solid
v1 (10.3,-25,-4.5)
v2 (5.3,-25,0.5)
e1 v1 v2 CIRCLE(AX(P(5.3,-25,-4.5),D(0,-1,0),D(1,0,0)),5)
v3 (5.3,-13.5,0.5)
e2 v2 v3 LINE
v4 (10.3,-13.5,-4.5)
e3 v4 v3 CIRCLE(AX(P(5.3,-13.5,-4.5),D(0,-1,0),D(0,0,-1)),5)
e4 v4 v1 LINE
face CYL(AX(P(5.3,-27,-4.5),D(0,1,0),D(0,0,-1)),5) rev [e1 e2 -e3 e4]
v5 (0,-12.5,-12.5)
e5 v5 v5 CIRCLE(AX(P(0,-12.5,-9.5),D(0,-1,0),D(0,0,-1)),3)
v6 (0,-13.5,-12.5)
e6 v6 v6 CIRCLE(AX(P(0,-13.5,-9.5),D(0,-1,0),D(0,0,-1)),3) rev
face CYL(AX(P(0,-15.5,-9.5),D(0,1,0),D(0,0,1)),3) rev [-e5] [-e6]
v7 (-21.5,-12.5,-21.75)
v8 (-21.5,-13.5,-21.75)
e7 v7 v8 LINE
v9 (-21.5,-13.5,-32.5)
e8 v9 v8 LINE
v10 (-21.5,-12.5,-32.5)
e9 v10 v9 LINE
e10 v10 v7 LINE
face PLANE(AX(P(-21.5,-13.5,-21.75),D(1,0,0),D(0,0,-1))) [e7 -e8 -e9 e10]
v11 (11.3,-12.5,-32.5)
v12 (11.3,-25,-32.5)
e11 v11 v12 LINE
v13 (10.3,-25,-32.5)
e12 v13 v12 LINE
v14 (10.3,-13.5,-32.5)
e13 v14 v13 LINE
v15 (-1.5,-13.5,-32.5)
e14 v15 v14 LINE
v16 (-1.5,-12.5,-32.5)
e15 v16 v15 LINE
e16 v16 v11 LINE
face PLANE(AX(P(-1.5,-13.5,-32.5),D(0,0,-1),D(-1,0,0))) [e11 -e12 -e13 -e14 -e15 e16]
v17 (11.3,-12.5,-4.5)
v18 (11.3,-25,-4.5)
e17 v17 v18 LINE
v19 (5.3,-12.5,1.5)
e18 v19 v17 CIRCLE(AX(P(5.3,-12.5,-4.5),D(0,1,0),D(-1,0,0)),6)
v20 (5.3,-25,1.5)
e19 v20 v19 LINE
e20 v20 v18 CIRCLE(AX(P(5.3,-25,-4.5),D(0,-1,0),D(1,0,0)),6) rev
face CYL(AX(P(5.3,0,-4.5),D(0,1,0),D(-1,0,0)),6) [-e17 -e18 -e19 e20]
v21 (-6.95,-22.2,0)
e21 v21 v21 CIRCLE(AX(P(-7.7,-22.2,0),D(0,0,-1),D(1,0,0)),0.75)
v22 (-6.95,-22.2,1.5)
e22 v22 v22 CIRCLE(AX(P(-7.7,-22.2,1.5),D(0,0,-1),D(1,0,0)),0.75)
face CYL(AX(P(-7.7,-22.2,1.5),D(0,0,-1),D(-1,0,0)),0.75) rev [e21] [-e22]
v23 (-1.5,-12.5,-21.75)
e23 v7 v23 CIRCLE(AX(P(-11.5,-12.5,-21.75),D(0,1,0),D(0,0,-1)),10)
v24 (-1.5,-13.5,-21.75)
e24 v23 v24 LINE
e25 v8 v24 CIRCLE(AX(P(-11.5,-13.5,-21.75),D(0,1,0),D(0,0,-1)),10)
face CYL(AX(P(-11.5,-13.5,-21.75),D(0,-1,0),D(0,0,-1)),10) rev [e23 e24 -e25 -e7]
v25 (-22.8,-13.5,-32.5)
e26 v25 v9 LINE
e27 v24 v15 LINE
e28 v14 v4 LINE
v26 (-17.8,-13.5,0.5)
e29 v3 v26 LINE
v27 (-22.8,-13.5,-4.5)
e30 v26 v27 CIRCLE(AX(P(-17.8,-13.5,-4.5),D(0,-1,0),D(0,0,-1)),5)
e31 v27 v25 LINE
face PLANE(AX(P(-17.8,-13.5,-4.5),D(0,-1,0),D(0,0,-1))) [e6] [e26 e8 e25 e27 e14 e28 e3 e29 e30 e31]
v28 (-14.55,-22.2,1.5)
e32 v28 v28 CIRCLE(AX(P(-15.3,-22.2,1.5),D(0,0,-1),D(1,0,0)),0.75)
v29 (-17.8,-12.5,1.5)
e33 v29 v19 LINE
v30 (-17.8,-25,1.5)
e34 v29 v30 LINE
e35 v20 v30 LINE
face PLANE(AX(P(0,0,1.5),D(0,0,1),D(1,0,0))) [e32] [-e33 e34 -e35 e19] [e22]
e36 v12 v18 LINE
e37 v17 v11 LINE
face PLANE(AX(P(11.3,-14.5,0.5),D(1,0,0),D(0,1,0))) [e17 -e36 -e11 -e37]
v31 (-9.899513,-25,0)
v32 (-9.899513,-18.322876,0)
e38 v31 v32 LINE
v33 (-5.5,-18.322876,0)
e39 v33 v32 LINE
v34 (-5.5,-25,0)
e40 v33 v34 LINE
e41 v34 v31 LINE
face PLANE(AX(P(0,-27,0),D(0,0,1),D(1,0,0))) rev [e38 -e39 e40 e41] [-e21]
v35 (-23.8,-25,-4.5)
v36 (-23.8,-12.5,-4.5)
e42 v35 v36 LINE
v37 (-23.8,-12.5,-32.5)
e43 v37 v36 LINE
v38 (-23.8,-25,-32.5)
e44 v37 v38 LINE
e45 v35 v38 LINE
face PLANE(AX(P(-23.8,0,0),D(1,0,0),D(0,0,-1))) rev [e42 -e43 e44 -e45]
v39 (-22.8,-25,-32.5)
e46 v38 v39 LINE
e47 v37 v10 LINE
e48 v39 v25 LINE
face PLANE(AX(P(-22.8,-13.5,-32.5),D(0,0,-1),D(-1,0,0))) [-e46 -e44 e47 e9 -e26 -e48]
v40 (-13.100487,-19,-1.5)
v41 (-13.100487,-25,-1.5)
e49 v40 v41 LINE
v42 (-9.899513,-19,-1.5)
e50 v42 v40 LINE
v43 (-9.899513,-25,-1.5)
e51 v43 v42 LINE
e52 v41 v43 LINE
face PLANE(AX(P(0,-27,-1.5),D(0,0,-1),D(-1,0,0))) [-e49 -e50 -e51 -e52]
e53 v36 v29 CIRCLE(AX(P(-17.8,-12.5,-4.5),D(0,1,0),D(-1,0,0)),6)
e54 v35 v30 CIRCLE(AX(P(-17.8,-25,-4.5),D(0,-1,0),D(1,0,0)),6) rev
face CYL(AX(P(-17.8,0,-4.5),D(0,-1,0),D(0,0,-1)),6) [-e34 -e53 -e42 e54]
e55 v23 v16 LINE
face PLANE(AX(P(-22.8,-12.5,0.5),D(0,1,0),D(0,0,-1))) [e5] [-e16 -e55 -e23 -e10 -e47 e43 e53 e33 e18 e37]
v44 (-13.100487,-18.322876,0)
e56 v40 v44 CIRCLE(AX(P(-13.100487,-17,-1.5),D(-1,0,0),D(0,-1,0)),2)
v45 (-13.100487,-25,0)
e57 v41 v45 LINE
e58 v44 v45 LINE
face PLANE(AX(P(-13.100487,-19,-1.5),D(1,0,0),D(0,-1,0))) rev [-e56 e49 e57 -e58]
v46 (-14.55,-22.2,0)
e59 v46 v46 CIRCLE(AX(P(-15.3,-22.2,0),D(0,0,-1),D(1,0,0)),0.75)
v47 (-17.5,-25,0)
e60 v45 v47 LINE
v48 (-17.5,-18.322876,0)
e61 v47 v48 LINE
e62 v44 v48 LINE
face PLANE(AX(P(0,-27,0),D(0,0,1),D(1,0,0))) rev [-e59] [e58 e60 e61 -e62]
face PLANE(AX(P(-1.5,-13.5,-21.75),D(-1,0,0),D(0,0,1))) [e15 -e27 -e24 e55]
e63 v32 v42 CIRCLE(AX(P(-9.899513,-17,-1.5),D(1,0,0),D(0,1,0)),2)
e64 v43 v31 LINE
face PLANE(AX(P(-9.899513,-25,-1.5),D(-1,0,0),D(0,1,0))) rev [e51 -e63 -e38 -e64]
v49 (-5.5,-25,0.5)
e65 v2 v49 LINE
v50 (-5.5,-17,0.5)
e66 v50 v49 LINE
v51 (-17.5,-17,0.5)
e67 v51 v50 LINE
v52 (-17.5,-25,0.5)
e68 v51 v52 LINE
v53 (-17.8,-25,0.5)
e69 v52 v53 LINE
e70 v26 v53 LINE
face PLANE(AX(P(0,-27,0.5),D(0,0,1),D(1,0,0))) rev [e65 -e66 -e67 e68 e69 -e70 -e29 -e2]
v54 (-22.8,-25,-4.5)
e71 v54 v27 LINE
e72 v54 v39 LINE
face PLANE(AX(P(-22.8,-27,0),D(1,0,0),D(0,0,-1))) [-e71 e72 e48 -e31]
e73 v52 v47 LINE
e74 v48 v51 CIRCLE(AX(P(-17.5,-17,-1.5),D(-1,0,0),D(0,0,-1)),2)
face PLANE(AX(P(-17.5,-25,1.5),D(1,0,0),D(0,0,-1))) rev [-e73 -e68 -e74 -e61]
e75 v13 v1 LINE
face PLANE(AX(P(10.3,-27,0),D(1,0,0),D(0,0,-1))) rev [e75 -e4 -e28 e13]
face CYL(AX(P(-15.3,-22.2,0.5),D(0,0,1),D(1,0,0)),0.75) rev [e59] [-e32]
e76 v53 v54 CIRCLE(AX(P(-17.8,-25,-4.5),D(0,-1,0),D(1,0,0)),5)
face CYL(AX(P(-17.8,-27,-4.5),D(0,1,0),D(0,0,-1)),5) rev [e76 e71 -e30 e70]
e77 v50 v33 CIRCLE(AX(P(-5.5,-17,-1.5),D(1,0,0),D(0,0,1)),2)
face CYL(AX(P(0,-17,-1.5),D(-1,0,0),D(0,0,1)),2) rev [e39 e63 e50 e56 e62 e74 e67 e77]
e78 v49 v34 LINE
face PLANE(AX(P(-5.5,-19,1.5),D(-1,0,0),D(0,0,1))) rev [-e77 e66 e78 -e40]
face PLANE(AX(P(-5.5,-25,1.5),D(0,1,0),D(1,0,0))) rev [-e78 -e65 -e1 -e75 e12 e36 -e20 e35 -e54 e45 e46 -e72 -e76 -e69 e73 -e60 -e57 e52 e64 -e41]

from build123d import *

# Parameters (mm, degrees)
SKETCH1_W             = 4.399513203
SKETCH1_H             = 6
SKETCH1_R             = 0.75
BOSS_EXTRUDE1_DEPTH   = 1.5
BOSS_EXTRUDE1_2_DEPTH = 1.5
BOSS_EXTRUDE2_START   = -1
SKETCH2_W             = 34.1
SKETCH2_H             = 12.5
SKETCH2_R             = 0.75
BOSS_EXTRUDE2_DEPTH   = 1
BOSS_EXTRUDE3_DEPTH   = 1
SKETCH5_W             = 34
SKETCH5_H             = 12.5
BOSS_EXTRUDE4_DEPTH   = 1
SKETCH6_W             = 34
SKETCH6_H             = 12.5
BOSS_EXTRUDE5_DEPTH   = 1
SKETCH7_W             = 3.200973594
SKETCH7_H             = 6
BOSS_EXTRUDE6_DEPTH   = 2
FILLET1_R             = 2
FILLET2_R             = 5
FILLET3_R             = 6
FILLET4_R             = 5
FILLET5_R             = 6
SKETCH8_R             = 3
CUT_EXTRUDE1_DEPTH    = 2
FILLET1_OF_MIRROR1_R  = 2
FILLET2_OF_MIRROR1_R  = 5
FILLET3_OF_MIRROR1_R  = 6
FILLET4_OF_MIRROR1_R  = 5
FILLET5_OF_MIRROR1_R  = 6
CUT_EXTRUDE2_START    = -10.5
CUT_EXTRUDE2_DEPTH    = 10.5
CUT_EXTRUDE4_START    = -1
CUT_EXTRUDE4_DEPTH    = 1


with BuildPart() as part:
    # Sketch1 → Boss-Extrude1 (new body)
    with BuildSketch(Plane.XY):
        with Locations((-7.699756602, -5)):
            Rectangle(SKETCH1_W, SKETCH1_H)
        with Locations((-7.7, -4.8)):
            Circle(SKETCH1_R, mode=Mode.SUBTRACT)
    boss_extrude1 = extrude(amount=BOSS_EXTRUDE1_DEPTH)



with BuildPart() as body_2:
    # Sketch1 → Boss-Extrude1 2 (new body)
    with BuildSketch(Plane.XY):
        with Locations((-15.300243399, -5)):
            Rectangle(SKETCH1_W, SKETCH1_H)
        with Locations((-15.3, -4.8)):
            Circle(SKETCH1_R, mode=Mode.SUBTRACT)
    boss_extrude1_2 = extrude(amount=BOSS_EXTRUDE1_2_DEPTH)


with BuildPart() as part_1:
    add(part.part)

    add(body_2.part)  # Boss-Extrude2 merges body 2
    # Sketch2 → Boss-Extrude2 (add)
    with BuildSketch(Plane.XY.offset(1.5).offset(BOSS_EXTRUDE2_START)):
        with Locations((-5.75, -8.25)):
            Rectangle(SKETCH2_W, SKETCH2_H)
        with Locations((-7.7, -4.8)):
            Circle(SKETCH2_R, mode=Mode.SUBTRACT)
        with Locations((-15.3, -4.8)):
            Circle(SKETCH2_R, mode=Mode.SUBTRACT)
    boss_extrude2 = extrude(amount=BOSS_EXTRUDE2_DEPTH)

    # Sketch4 → Boss-Extrude3 (add)
    with BuildSketch(Plane.XZ.offset(14.5)):
        with BuildLine():
            Line((-22.8, 0.5), (-22.8, -32.5))
            Line((-22.8, -32.5), (-21.5, -32.5))
            Line((-21.5, -32.5), (-21.5, -21.75))
            ThreePointArc((-21.5, -21.75), (-11.5, -11.75), (-1.5, -21.75))
            Line((-1.5, -21.75), (-1.5, -32.5))
            Line((-1.5, -32.5), (11.3, -32.5))
            Line((11.3, -32.5), (11.3, 0.5))
            Line((11.3, 0.5), (-22.8, 0.5))
        make_face()
    boss_extrude3 = extrude(amount=-BOSS_EXTRUDE3_DEPTH)

    # Sketch5 → Boss-Extrude4 (add)
    with BuildSketch(Plane.ZY.offset(22.8)):
        with Locations((-15.5, -8.25)):
            Rectangle(SKETCH5_W, SKETCH5_H)
    boss_extrude4 = extrude(amount=BOSS_EXTRUDE4_DEPTH)

    # Sketch6 → Boss-Extrude5 (add)
    with BuildSketch(Plane(origin=(11.3, 0, 0), x_dir=(0, 0, -1), z_dir=(1, 0, 0))):
        with Locations((15.5, -8.25)):
            Rectangle(SKETCH6_W, SKETCH6_H)
    boss_extrude5 = extrude(amount=-BOSS_EXTRUDE5_DEPTH)

    # Sketch7 → Boss-Extrude6 (add)
    with BuildSketch(Plane(origin=(0, 0, 0.5), x_dir=(-1, 0, 0), z_dir=(0, 0, -1))):
        with Locations((11.5, -5)):
            Rectangle(SKETCH7_W, SKETCH7_H)
    boss_extrude6 = extrude(amount=BOSS_EXTRUDE6_DEPTH)

    # Fillet1
    # the kernel refuses this fillet: 2 mm, written as the material it adds along each edge
    with BuildSketch(Plane(origin=(-17.5, -8, 0.5), x_dir=(0, 0, -1), z_dir=(1, 0, 0))) as fillet1_piece_1_section:
        with BuildLine():
            CenterArc((FILLET1_R, -FILLET1_R), FILLET1_R, 90, 90)
            Line((0, -FILLET1_R), (0, 0))
            Line((0, 0), (FILLET1_R, 0))
        make_face()
    fillet1_piece_1 = extrude(amount=12, mode=Mode.PRIVATE)
    fillet1_piece_1 = split(fillet1_piece_1, bisect_by=Plane(origin=(-15.300243398, -8.620266002, 0), z_dir=(0, 0, 1)), keep=Keep.TOP, mode=Mode.PRIVATE)
    fillet1_piece_1 = split(fillet1_piece_1, bisect_by=Plane(origin=(-13.100486797, -8.620266002, 0.317331321), z_dir=(-1, 0, 0)), keep=Keep.TOP, mode=Mode.PRIVATE)
    add(fillet1_piece_1)
    with BuildSketch(Plane(origin=(-17.5, -8, 0.5), x_dir=(0, 0, -1), z_dir=(1, 0, 0))) as fillet1_piece_2_section:
        with BuildLine():
            CenterArc((FILLET1_R, -FILLET1_R), FILLET1_R, 90, 90)
            Line((0, -FILLET1_R), (0, 0))
            Line((0, 0), (FILLET1_R, 0))
        make_face()
    fillet1_piece_2 = extrude(amount=12, mode=Mode.PRIVATE)
    fillet1_piece_2 = split(fillet1_piece_2, bisect_by=Plane(origin=(-9.899513203, -8.160707913, -0.423889575), z_dir=(-1, 0, 0)), keep=Keep.TOP, mode=Mode.PRIVATE)
    fillet1_piece_2 = split(fillet1_piece_2, bisect_by=Plane(origin=(-11.5, -8.160707913, 0), z_dir=(0, 0, -1)), keep=Keep.TOP, mode=Mode.PRIVATE)
    fillet1_piece_2 = split(fillet1_piece_2, bisect_by=Plane(origin=(-13.100486797, -8.160707913, -0.423889575), z_dir=(1, 0, 0)), keep=Keep.TOP, mode=Mode.PRIVATE)
    add(fillet1_piece_2)
    with BuildSketch(Plane(origin=(-17.5, -8, 0.5), x_dir=(0, 0, -1), z_dir=(1, 0, 0))) as fillet1_piece_3_section:
        with BuildLine():
            CenterArc((FILLET1_R, -FILLET1_R), FILLET1_R, 90, 90)
            Line((0, -FILLET1_R), (0, 0))
            Line((0, 0), (FILLET1_R, 0))
        make_face()
    fillet1_piece_3 = extrude(amount=12, mode=Mode.PRIVATE)
    fillet1_piece_3 = split(fillet1_piece_3, bisect_by=Plane(origin=(-9.899513203, -8.620266002, 0.317331321), z_dir=(-1, 0, 0)), keep=Keep.TOP, mode=Mode.PRIVATE)
    fillet1_piece_3 = split(fillet1_piece_3, bisect_by=Plane(origin=(-11.5, -8.620266002, 0), z_dir=(0, 0, 1)), keep=Keep.TOP, mode=Mode.PRIVATE)
    fillet1_piece_3 = split(fillet1_piece_3, bisect_by=Plane(origin=(-13.100486797, -8.620266002, 0.317331321), z_dir=(1, 0, 0)), keep=Keep.TOP, mode=Mode.PRIVATE)
    add(fillet1_piece_3)
    with BuildSketch(Plane(origin=(-17.5, -8, 0.5), x_dir=(0, 0, -1), z_dir=(1, 0, 0))) as fillet1_piece_4_section:
        with BuildLine():
            CenterArc((FILLET1_R, -FILLET1_R), FILLET1_R, 90, 90)
            Line((0, -FILLET1_R), (0, 0))
            Line((0, 0), (FILLET1_R, 0))
        make_face()
    fillet1_piece_4 = extrude(amount=12, mode=Mode.PRIVATE)
    fillet1_piece_4 = split(fillet1_piece_4, bisect_by=Plane(origin=(-9.899513203, -8.620266002, 0.317331321), z_dir=(1, 0, 0)), keep=Keep.TOP, mode=Mode.PRIVATE)
    fillet1_piece_4 = split(fillet1_piece_4, bisect_by=Plane(origin=(-7.699756602, -8.620266002, 0), z_dir=(0, 0, 1)), keep=Keep.TOP, mode=Mode.PRIVATE)
    add(fillet1_piece_4)

    # Fillet2
    fillet2_edges = [part_1.edges().sort_by_distance(p)[0] for p in [
        (-22.8, -7.75, 0.5),
    ]]
    fillet(fillet2_edges, radius=FILLET2_R)

    # Fillet3
    fillet3_edges = [part_1.edges().sort_by_distance(p)[0] for p in [
        (-23.8, -8.25, 1.5),
    ]]
    fillet(fillet3_edges, radius=FILLET3_R)

    # Fillet4
    fillet4_edges = [part_1.edges().sort_by_distance(p)[0] for p in [
        (10.3, -7.75, 0.5),
    ]]
    fillet(fillet4_edges, radius=FILLET4_R)

    # Fillet5
    fillet5_edges = [part_1.edges().sort_by_distance(p)[0] for p in [
        (11.3, -8.25, 1.5),
    ]]
    fillet(fillet5_edges, radius=FILLET5_R)

    # Sketch8 → Cut-Extrude1 (cut)
    with BuildSketch(Plane(origin=(0, -13.5, 0), x_dir=(1, 0, 0), z_dir=(0, 1, 0))):
        with Locations(Location((0, 9.5, 0), (0, 0, 270))):
            Circle(SKETCH8_R)
    cut_extrude1 = extrude(amount=-CUT_EXTRUDE1_DEPTH, mode=Mode.SUBTRACT)

    # Mirror1: Boss-Extrude1, Boss-Extrude1 2, Boss-Extrude2, Boss-Extrude3, Boss-Extrude4, Boss-Extrude5, Boss-Extrude6, Cut-Extrude1 across plane
    add(boss_extrude1.mirror(Plane(origin=(-11.5, -13.5, -21.75), x_dir=(0, 0, 1), z_dir=(0, -1, 0))))
    add(boss_extrude1_2.mirror(Plane(origin=(-11.5, -13.5, -21.75), x_dir=(0, 0, 1), z_dir=(0, -1, 0))))
    add(boss_extrude2.mirror(Plane(origin=(-11.5, -13.5, -21.75), x_dir=(0, 0, 1), z_dir=(0, -1, 0))))
    add(boss_extrude3.mirror(Plane(origin=(-11.5, -13.5, -21.75), x_dir=(0, 0, 1), z_dir=(0, -1, 0))))
    add(boss_extrude4.mirror(Plane(origin=(-11.5, -13.5, -21.75), x_dir=(0, 0, 1), z_dir=(0, -1, 0))))
    add(boss_extrude5.mirror(Plane(origin=(-11.5, -13.5, -21.75), x_dir=(0, 0, 1), z_dir=(0, -1, 0))))
    add(boss_extrude6.mirror(Plane(origin=(-11.5, -13.5, -21.75), x_dir=(0, 0, 1), z_dir=(0, -1, 0))))
    add(cut_extrude1.mirror(Plane(origin=(-11.5, -13.5, -21.75), x_dir=(0, 0, 1), z_dir=(0, -1, 0))), mode=Mode.SUBTRACT)

    # Fillet1 of Mirror1
    # the kernel refuses this fillet: 2 mm, written as the material it adds along each edge
    with BuildSketch(Plane(origin=(-5.5, -19, 0.5), x_dir=(0, 1, 0), z_dir=(-1, 0, 0))) as fillet1_of_mirror1_piece_1_section:
        with BuildLine():
            CenterArc((FILLET1_OF_MIRROR1_R, FILLET1_OF_MIRROR1_R), FILLET1_OF_MIRROR1_R, 180, 90)
            Line((0, FILLET1_OF_MIRROR1_R), (0, 0))
            Line((0, 0), (FILLET1_OF_MIRROR1_R, 0))
        make_face()
    fillet1_of_mirror1_piece_1 = extrude(amount=12, mode=Mode.PRIVATE)
    fillet1_of_mirror1_piece_1 = split(fillet1_of_mirror1_piece_1, bisect_by=Plane(origin=(-7.699756602, -18.379733998, 0), z_dir=(0, 0, 1)), keep=Keep.TOP, mode=Mode.PRIVATE)
    fillet1_of_mirror1_piece_1 = split(fillet1_of_mirror1_piece_1, bisect_by=Plane(origin=(-9.899513203, -18.379733998, 0.317331321), z_dir=(1, 0, 0)), keep=Keep.TOP, mode=Mode.PRIVATE)
    add(fillet1_of_mirror1_piece_1)
    with BuildSketch(Plane(origin=(-5.5, -19, 0.5), x_dir=(0, 1, 0), z_dir=(-1, 0, 0))) as fillet1_of_mirror1_piece_2_section:
        with BuildLine():
            CenterArc((FILLET1_OF_MIRROR1_R, FILLET1_OF_MIRROR1_R), FILLET1_OF_MIRROR1_R, 180, 90)
            Line((0, FILLET1_OF_MIRROR1_R), (0, 0))
            Line((0, 0), (FILLET1_OF_MIRROR1_R, 0))
        make_face()
    fillet1_of_mirror1_piece_2 = extrude(amount=12, mode=Mode.PRIVATE)
    fillet1_of_mirror1_piece_2 = split(fillet1_of_mirror1_piece_2, bisect_by=Plane(origin=(-11.5, -18.379733998, 0), z_dir=(0, 0, 1)), keep=Keep.TOP, mode=Mode.PRIVATE)
    fillet1_of_mirror1_piece_2 = split(fillet1_of_mirror1_piece_2, bisect_by=Plane(origin=(-13.100486797, -18.379733998, 0.317331321), z_dir=(1, 0, 0)), keep=Keep.TOP, mode=Mode.PRIVATE)
    fillet1_of_mirror1_piece_2 = split(fillet1_of_mirror1_piece_2, bisect_by=Plane(origin=(-9.899513203, -18.379733998, 0.317331321), z_dir=(-1, 0, 0)), keep=Keep.TOP, mode=Mode.PRIVATE)
    add(fillet1_of_mirror1_piece_2)
    with BuildSketch(Plane(origin=(-5.5, -19, 0.5), x_dir=(0, 1, 0), z_dir=(-1, 0, 0))) as fillet1_of_mirror1_piece_3_section:
        with BuildLine():
            CenterArc((FILLET1_OF_MIRROR1_R, FILLET1_OF_MIRROR1_R), FILLET1_OF_MIRROR1_R, 180, 90)
            Line((0, FILLET1_OF_MIRROR1_R), (0, 0))
            Line((0, 0), (FILLET1_OF_MIRROR1_R, 0))
        make_face()
    fillet1_of_mirror1_piece_3 = extrude(amount=12, mode=Mode.PRIVATE)
    fillet1_of_mirror1_piece_3 = split(fillet1_of_mirror1_piece_3, bisect_by=Plane(origin=(-11.5, -18.839292087, 0), z_dir=(0, 0, -1)), keep=Keep.TOP, mode=Mode.PRIVATE)
    fillet1_of_mirror1_piece_3 = split(fillet1_of_mirror1_piece_3, bisect_by=Plane(origin=(-13.100486797, -18.839292087, -0.423889575), z_dir=(1, 0, 0)), keep=Keep.TOP, mode=Mode.PRIVATE)
    fillet1_of_mirror1_piece_3 = split(fillet1_of_mirror1_piece_3, bisect_by=Plane(origin=(-9.899513203, -18.839292087, -0.423889575), z_dir=(-1, 0, 0)), keep=Keep.TOP, mode=Mode.PRIVATE)
    add(fillet1_of_mirror1_piece_3)
    with BuildSketch(Plane(origin=(-5.5, -19, 0.5), x_dir=(0, 1, 0), z_dir=(-1, 0, 0))) as fillet1_of_mirror1_piece_4_section:
        with BuildLine():
            CenterArc((FILLET1_OF_MIRROR1_R, FILLET1_OF_MIRROR1_R), FILLET1_OF_MIRROR1_R, 180, 90)
            Line((0, FILLET1_OF_MIRROR1_R), (0, 0))
            Line((0, 0), (FILLET1_OF_MIRROR1_R, 0))
        make_face()
    fillet1_of_mirror1_piece_4 = extrude(amount=12, mode=Mode.PRIVATE)
    fillet1_of_mirror1_piece_4 = split(fillet1_of_mirror1_piece_4, bisect_by=Plane(origin=(-15.300243398, -18.379733998, 0), z_dir=(0, 0, 1)), keep=Keep.TOP, mode=Mode.PRIVATE)
    fillet1_of_mirror1_piece_4 = split(fillet1_of_mirror1_piece_4, bisect_by=Plane(origin=(-13.100486797, -18.379733998, 0.317331321), z_dir=(-1, 0, 0)), keep=Keep.TOP, mode=Mode.PRIVATE)
    add(fillet1_of_mirror1_piece_4)

    # Fillet2 of Mirror1
    fillet2_of_mirror1_edges = [part_1.edges().sort_by_distance(p)[0] for p in [
        (-22.8, -19.25, 0.5),
    ]]
    fillet(fillet2_of_mirror1_edges, radius=FILLET2_OF_MIRROR1_R)

    # Fillet3 of Mirror1
    fillet3_of_mirror1_edges = [part_1.edges().sort_by_distance(p)[0] for p in [
        (-23.8, -18.75, 1.5),
    ]]
    fillet(fillet3_of_mirror1_edges, radius=FILLET3_OF_MIRROR1_R)

    # Fillet4 of Mirror1
    fillet4_of_mirror1_edges = [part_1.edges().sort_by_distance(p)[0] for p in [
        (10.3, -19.25, 0.5),
    ]]
    fillet(fillet4_of_mirror1_edges, radius=FILLET4_OF_MIRROR1_R)

    # Fillet5 of Mirror1
    fillet5_of_mirror1_edges = [part_1.edges().sort_by_distance(p)[0] for p in [
        (11.3, -18.75, 1.5),
    ]]
    fillet(fillet5_of_mirror1_edges, radius=FILLET5_OF_MIRROR1_R)

    # Sketch9 → Cut-Extrude2 (cut)
    with BuildSketch(Plane(origin=(0, -2, 0), x_dir=(1, 0, 0), z_dir=(0, 1, 0)).offset(CUT_EXTRUDE2_START)):
        with BuildLine():
            Line((-17.8, -1.5), (5.3, -1.5))
            ThreePointArc((5.3, -1.5), (9.542640687, 0.257359313), (11.3, 4.5))
            Line((11.3, 4.5), (11.3, 32.5))
            Line((11.3, 32.5), (10.3, 32.5))
            Line((10.3, 32.5), (10.3, 4.5))
            ThreePointArc((10.3, 4.5), (8.835533906, 0.964466094), (5.3, -0.5))
            Line((5.3, -0.5), (-5.5, -0.5))
            Line((-5.5, -0.5), (-5.5, 0))
            Line((-5.5, 0), (-9.899513203, 0))
            Line((-9.899513203, 0), (-9.899513203, 1.5))
            Line((-9.899513203, 1.5), (-13.100486797, 1.5))
            Line((-13.100486797, 1.5), (-13.100486797, 0))
            Line((-13.100486797, 0), (-17.5, 0))
            Line((-17.5, 0), (-17.5, -0.5))
            Line((-17.5, -0.5), (-17.8, -0.5))
            ThreePointArc((-17.8, -0.5), (-21.335533906, 0.964466094), (-22.8, 4.5))
            Line((-22.8, 4.5), (-22.8, 32.5))
            Line((-22.8, 32.5), (-23.8, 32.5))
            Line((-23.8, 32.5), (-23.8, 4.5))
            ThreePointArc((-23.8, 4.5), (-22.042640687, 0.257359313), (-17.8, -1.5))
        make_face()
    extrude(amount=CUT_EXTRUDE2_DEPTH, mode=Mode.SUBTRACT)

    # Sketch12 → Cut-Extrude4 (cut)
    with BuildSketch(Plane.XZ.offset(14.5).offset(CUT_EXTRUDE4_START)):
        with BuildLine():
            Line((-22.8, -4.5), (-22.8, -32.5))
            Line((-22.8, -32.5), (-21.5, -32.5))
            Line((-21.5, -32.5), (-21.5, -21.75))
            ThreePointArc((-21.5, -21.75), (-11.5, -11.75), (-1.5, -21.75))
            Line((-1.5, -21.75), (-1.5, -32.5))
            Line((-1.5, -32.5), (10.3, -32.5))
            Line((10.3, -32.5), (10.3, -4.5))
            ThreePointArc((10.3, -4.5), (8.835533906, -0.964466094), (5.3, 0.5))
            Line((5.3, 0.5), (-17.8, 0.5))
            ThreePointArc((-17.8, 0.5), (-21.335533906, -0.964466094), (-22.8, -4.5))
        make_face()
    extrude(amount=CUT_EXTRUDE4_DEPTH, mode=Mode.SUBTRACT)


solid = part_1.part
